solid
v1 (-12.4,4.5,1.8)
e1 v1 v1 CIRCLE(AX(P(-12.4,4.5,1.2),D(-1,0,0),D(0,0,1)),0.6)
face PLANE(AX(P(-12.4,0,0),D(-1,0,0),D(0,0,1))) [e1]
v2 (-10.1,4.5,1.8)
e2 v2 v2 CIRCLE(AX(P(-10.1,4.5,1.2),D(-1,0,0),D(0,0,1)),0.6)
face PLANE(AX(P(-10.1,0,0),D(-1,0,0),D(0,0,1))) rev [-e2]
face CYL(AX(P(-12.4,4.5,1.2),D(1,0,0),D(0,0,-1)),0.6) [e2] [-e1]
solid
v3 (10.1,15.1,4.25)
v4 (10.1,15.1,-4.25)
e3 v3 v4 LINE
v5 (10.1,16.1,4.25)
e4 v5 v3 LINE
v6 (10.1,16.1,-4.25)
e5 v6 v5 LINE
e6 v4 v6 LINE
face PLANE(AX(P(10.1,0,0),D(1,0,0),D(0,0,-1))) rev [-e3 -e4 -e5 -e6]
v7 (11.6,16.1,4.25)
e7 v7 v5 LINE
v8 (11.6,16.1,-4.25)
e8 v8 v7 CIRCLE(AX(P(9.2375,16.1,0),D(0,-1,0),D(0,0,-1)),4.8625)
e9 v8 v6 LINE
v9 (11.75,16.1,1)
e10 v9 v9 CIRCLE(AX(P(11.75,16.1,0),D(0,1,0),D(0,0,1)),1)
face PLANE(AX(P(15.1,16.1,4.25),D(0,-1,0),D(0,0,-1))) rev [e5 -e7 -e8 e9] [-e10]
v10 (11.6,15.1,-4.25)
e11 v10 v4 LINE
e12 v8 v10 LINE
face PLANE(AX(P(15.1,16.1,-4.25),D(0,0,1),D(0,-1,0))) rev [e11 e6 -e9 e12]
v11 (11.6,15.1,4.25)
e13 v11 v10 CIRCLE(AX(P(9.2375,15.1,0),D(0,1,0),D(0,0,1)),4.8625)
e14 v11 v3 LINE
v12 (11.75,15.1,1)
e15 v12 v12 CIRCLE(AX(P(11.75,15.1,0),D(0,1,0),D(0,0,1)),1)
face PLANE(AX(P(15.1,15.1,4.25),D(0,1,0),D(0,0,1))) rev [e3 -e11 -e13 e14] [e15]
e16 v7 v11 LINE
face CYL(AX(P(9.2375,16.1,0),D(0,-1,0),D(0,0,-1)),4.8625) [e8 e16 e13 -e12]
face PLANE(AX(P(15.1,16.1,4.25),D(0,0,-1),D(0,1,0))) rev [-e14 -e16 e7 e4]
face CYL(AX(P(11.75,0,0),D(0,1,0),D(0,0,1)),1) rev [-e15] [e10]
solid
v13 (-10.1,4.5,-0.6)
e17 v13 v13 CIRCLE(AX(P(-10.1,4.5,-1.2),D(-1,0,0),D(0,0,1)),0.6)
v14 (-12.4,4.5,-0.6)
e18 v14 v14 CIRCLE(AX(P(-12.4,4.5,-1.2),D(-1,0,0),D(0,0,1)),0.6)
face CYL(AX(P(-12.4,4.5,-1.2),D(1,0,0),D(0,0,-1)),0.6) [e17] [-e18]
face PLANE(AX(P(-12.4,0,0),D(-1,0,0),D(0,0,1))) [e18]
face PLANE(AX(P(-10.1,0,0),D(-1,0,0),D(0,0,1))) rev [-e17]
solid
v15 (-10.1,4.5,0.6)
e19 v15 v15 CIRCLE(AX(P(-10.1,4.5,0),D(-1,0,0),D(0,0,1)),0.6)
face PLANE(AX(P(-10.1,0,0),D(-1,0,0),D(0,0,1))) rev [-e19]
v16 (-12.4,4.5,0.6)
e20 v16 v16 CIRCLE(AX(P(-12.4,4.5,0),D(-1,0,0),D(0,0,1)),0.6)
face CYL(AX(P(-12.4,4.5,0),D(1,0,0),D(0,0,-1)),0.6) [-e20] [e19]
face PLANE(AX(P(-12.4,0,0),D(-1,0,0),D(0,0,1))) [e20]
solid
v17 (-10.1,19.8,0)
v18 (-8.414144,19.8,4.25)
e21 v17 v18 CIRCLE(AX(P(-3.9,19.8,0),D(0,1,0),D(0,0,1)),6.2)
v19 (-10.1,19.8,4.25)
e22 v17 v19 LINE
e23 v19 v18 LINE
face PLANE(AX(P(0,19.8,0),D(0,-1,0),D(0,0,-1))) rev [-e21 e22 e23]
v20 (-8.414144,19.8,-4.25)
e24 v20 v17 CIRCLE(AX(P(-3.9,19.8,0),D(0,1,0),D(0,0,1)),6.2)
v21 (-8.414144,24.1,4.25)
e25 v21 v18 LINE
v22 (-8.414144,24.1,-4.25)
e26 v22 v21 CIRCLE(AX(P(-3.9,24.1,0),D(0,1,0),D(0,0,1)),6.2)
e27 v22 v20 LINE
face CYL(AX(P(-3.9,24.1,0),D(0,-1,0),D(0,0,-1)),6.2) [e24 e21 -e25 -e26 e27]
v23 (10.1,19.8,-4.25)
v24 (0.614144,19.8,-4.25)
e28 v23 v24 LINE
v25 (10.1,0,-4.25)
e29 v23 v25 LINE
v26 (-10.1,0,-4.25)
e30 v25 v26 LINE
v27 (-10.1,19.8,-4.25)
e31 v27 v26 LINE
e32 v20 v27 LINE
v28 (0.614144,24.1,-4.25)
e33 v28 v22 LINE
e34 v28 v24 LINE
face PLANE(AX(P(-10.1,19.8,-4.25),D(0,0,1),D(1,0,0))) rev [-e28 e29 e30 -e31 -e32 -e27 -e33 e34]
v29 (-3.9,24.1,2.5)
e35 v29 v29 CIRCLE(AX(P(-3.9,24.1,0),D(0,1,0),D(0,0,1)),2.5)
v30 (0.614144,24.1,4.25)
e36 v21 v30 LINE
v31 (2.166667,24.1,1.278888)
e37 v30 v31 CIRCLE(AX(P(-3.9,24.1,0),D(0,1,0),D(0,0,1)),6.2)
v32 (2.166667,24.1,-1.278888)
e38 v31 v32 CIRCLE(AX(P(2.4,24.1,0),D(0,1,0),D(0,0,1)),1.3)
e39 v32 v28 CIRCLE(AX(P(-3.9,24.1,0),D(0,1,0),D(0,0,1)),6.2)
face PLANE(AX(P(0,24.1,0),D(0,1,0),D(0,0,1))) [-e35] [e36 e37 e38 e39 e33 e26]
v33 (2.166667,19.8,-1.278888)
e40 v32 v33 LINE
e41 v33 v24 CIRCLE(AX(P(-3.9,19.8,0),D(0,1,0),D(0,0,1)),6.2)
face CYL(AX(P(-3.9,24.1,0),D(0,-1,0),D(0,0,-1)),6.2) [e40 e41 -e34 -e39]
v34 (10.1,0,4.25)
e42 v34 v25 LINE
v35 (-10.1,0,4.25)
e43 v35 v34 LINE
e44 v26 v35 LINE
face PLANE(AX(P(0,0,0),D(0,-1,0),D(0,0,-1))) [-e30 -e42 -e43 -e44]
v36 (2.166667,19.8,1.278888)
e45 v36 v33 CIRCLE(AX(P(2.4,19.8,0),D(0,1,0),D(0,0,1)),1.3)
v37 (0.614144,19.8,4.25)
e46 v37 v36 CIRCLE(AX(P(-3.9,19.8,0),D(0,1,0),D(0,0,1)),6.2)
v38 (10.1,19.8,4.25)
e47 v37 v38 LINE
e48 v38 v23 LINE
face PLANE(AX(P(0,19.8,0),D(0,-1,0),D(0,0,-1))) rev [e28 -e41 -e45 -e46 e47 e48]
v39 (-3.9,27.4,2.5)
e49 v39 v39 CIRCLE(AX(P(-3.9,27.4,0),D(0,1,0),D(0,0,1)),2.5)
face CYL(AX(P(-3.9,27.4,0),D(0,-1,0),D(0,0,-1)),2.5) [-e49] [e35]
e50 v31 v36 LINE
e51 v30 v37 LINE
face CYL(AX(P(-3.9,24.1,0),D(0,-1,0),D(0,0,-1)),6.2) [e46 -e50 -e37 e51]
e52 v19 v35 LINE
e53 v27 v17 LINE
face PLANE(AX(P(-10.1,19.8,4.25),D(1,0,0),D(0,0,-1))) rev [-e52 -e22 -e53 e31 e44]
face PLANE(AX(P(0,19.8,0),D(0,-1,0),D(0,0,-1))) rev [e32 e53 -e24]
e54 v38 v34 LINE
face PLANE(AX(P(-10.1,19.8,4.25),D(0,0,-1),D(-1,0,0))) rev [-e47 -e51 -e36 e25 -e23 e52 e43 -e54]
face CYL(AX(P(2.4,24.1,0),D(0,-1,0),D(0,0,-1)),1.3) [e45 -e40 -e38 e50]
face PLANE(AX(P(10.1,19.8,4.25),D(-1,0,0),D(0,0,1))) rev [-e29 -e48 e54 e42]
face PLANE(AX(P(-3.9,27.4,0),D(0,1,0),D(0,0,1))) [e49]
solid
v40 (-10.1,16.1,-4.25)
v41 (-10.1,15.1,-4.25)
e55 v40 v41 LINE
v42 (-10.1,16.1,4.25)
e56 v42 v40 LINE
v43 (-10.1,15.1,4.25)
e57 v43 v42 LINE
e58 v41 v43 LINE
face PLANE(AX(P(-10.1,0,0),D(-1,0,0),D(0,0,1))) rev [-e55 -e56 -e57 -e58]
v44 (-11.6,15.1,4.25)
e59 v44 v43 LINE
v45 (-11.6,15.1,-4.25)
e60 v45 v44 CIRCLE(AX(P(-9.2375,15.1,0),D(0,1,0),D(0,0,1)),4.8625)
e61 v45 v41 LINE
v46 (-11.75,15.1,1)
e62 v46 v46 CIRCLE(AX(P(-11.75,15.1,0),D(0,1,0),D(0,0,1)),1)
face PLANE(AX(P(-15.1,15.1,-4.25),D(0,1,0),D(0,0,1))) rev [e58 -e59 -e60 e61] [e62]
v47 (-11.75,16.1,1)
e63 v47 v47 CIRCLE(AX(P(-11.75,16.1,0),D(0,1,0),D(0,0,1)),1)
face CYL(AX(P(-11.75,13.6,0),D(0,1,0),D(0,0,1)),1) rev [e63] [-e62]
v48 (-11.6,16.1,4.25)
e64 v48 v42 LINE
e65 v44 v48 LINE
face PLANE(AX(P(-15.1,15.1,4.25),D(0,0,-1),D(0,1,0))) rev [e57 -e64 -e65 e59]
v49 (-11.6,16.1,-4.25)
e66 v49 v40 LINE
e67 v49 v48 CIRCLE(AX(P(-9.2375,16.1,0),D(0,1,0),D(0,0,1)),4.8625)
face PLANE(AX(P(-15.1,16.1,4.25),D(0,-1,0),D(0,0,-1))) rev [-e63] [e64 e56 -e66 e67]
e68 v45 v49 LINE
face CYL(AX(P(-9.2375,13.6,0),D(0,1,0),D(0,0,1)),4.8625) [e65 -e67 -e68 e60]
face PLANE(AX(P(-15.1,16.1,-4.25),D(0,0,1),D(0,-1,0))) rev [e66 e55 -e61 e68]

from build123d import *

# Parameters (mm, degrees)
SKETCH1_W                  = 20.2
SKETCH1_H                  = 8.5
BOSS_EXTRUDE1_DEPTH        = 19.8
SKETCH2_W                  = 8.5
SKETCH2_H                  = 1
BOSS_EXTRUDE2_DEPTH        = 5
SKETCH3_W                  = 8.5
SKETCH3_H                  = 1
BOSS_EXTRUDE3_DEPTH        = 5
SKETCH4_R                  = 1
CUT_EXTRUDE1_DEPTH         = 2.5
BOSS_EXTRUDE4_DEPTH        = 4.3
SKETCH7_R                  = 2.5
BOSS_EXTRUDE5_DEPTH        = 3.3
SKETCH8_R                  = 0.6
BOSS_EXTRUDE7_DEPTH        = 2.3
BOSS_EXTRUDE7_2_DEPTH      = 2.3
BOSS_EXTRUDE7_3_DEPTH      = 2.3
WYTNIJ_WYCI_GNI_CIE1_DEPTH = 23.478489718
SKETCH4_5_R                = 1
WYTNIJ_WYCI_GNI_CIE2_DEPTH = 22.819314838


# Read off the part's stored shape, not the designer's step: Boss-Extrude4
with BuildPart() as part:
    # Sketch1 → Boss-Extrude1 (new body)
    with BuildSketch(Plane(origin=(0, 0, 0), x_dir=(1, 0, 0), z_dir=(0, 1, 0))):
        Rectangle(SKETCH1_W, SKETCH1_H)
    extrude(amount=BOSS_EXTRUDE1_DEPTH)

    # Boss-Extrude4 outline → Boss-Extrude4 (add)
    with BuildSketch(Plane(origin=(0, 19.8, 0), x_dir=(1, 0, 0), z_dir=(0, 1, 0))):
        with BuildLine():
            Line((0.614144437, 4.25), (-8.414144437, 4.25))
            ThreePointArc((-8.414144437, 4.25), (-10.1, 0), (-8.414144437, -4.25))
            Line((-8.414144437, -4.25), (0.614144437, -4.25))
            ThreePointArc((0.614144437, -4.25), (1.595022014, -2.871364322), (2.166666667, -1.278888406))
            ThreePointArc((2.166666667, -1.278888406), (3.7, 0), (2.166666667, 1.278888406))
            ThreePointArc((2.166666667, 1.278888406), (1.595022014, 2.871364322), (0.614144437, 4.25))
        make_face()
    extrude(amount=BOSS_EXTRUDE4_DEPTH)

    # Sketch7 → Boss-Extrude5 (add)
    with BuildSketch(Plane(origin=(0, 24.1, 0), x_dir=(1, 0, 0), z_dir=(0, 1, 0))):
        with Locations(Location((-3.9, 0, 0), (0, 0, 270))):
            Circle(SKETCH7_R)
    extrude(amount=BOSS_EXTRUDE5_DEPTH)


with BuildPart() as body_2:
    # Sketch2 → Boss-Extrude2 (new body)
    with BuildSketch(Plane(origin=(10.1, 0, 0), x_dir=(0, 0, -1), z_dir=(1, 0, 0))):
        with Locations((0, 15.6)):
            Rectangle(SKETCH2_W, SKETCH2_H)
    extrude(amount=BOSS_EXTRUDE2_DEPTH)

    # Sketch4<4> → Wytnij-wyciągnięcie1 (cut, through all)
    with BuildSketch(Plane(origin=(0, 16.1, 0), x_dir=(1, 0, 0), z_dir=(0, 1, 0))):
        with BuildLine():
            Line((15.1, 4.25), (11.6, 4.25))
            ThreePointArc((11.6, 4.25), (14.1, 0), (11.6, -4.25))
            Line((11.6, -4.25), (15.1, -4.25))
            Line((15.1, -4.25), (15.1, 4.25))
        make_face()
    extrude(amount=-WYTNIJ_WYCI_GNI_CIE1_DEPTH, mode=Mode.SUBTRACT)

    # Sketch4<5> → Wytnij-wyciągnięcie2 (cut, through all)
    with BuildSketch(Plane(origin=(0, 16.1, 0), x_dir=(1, 0, 0), z_dir=(0, 1, 0))):
        with Locations(Location((11.75, 0, 0), (0, 0, 270))):
            Circle(SKETCH4_5_R)
    extrude(amount=-WYTNIJ_WYCI_GNI_CIE2_DEPTH, mode=Mode.SUBTRACT)


with BuildPart() as body_3:
    # Sketch3 → Boss-Extrude3 (new body)
    with BuildSketch(Plane.ZY.offset(10.1)):
        with Locations((0, 15.6)):
            Rectangle(SKETCH3_W, SKETCH3_H)
    extrude(amount=BOSS_EXTRUDE3_DEPTH)

    # Sketch4 → Cut-Extrude1 (cut)
    with BuildSketch(Plane(origin=(0, 16.1, 0), x_dir=(1, 0, 0), z_dir=(0, 1, 0))):
        with BuildLine():
            ThreePointArc((-11.6, -4.25), (-14.1, 0), (-11.6, 4.25))
            Line((-11.6, 4.25), (-15.1, 4.25))
            Line((-15.1, 4.25), (-15.1, -4.25))
            Line((-15.1, -4.25), (-11.6, -4.25))
        make_face()
        with Locations(Location((-11.75, 0, 0), (0, 0, 270))):
            Circle(SKETCH4_R)
    extrude(amount=-CUT_EXTRUDE1_DEPTH, mode=Mode.SUBTRACT)


with BuildPart() as body_4:
    # Sketch8 → Boss-Extrude7 (new body)
    with BuildSketch(Plane.ZY.offset(10.1)):
        with Locations((0, 4.5)):
            Circle(SKETCH8_R)
    extrude(amount=BOSS_EXTRUDE7_DEPTH)


with BuildPart() as body_5:
    # Sketch8 → Boss-Extrude7 2 (new body)
    with BuildSketch(Plane.ZY.offset(10.1)):
        with Locations((-1.2, 4.5)):
            Circle(SKETCH8_R)
    extrude(amount=BOSS_EXTRUDE7_2_DEPTH)


with BuildPart() as body_6:
    # Sketch8 → Boss-Extrude7 3 (new body)
    with BuildSketch(Plane.ZY.offset(10.1)):
        with Locations((1.2, 4.5)):
            Circle(SKETCH8_R)
    extrude(amount=BOSS_EXTRUDE7_3_DEPTH)


solid = Compound([part.part, body_2.part, body_3.part, body_4.part, body_5.part, body_6.part])
